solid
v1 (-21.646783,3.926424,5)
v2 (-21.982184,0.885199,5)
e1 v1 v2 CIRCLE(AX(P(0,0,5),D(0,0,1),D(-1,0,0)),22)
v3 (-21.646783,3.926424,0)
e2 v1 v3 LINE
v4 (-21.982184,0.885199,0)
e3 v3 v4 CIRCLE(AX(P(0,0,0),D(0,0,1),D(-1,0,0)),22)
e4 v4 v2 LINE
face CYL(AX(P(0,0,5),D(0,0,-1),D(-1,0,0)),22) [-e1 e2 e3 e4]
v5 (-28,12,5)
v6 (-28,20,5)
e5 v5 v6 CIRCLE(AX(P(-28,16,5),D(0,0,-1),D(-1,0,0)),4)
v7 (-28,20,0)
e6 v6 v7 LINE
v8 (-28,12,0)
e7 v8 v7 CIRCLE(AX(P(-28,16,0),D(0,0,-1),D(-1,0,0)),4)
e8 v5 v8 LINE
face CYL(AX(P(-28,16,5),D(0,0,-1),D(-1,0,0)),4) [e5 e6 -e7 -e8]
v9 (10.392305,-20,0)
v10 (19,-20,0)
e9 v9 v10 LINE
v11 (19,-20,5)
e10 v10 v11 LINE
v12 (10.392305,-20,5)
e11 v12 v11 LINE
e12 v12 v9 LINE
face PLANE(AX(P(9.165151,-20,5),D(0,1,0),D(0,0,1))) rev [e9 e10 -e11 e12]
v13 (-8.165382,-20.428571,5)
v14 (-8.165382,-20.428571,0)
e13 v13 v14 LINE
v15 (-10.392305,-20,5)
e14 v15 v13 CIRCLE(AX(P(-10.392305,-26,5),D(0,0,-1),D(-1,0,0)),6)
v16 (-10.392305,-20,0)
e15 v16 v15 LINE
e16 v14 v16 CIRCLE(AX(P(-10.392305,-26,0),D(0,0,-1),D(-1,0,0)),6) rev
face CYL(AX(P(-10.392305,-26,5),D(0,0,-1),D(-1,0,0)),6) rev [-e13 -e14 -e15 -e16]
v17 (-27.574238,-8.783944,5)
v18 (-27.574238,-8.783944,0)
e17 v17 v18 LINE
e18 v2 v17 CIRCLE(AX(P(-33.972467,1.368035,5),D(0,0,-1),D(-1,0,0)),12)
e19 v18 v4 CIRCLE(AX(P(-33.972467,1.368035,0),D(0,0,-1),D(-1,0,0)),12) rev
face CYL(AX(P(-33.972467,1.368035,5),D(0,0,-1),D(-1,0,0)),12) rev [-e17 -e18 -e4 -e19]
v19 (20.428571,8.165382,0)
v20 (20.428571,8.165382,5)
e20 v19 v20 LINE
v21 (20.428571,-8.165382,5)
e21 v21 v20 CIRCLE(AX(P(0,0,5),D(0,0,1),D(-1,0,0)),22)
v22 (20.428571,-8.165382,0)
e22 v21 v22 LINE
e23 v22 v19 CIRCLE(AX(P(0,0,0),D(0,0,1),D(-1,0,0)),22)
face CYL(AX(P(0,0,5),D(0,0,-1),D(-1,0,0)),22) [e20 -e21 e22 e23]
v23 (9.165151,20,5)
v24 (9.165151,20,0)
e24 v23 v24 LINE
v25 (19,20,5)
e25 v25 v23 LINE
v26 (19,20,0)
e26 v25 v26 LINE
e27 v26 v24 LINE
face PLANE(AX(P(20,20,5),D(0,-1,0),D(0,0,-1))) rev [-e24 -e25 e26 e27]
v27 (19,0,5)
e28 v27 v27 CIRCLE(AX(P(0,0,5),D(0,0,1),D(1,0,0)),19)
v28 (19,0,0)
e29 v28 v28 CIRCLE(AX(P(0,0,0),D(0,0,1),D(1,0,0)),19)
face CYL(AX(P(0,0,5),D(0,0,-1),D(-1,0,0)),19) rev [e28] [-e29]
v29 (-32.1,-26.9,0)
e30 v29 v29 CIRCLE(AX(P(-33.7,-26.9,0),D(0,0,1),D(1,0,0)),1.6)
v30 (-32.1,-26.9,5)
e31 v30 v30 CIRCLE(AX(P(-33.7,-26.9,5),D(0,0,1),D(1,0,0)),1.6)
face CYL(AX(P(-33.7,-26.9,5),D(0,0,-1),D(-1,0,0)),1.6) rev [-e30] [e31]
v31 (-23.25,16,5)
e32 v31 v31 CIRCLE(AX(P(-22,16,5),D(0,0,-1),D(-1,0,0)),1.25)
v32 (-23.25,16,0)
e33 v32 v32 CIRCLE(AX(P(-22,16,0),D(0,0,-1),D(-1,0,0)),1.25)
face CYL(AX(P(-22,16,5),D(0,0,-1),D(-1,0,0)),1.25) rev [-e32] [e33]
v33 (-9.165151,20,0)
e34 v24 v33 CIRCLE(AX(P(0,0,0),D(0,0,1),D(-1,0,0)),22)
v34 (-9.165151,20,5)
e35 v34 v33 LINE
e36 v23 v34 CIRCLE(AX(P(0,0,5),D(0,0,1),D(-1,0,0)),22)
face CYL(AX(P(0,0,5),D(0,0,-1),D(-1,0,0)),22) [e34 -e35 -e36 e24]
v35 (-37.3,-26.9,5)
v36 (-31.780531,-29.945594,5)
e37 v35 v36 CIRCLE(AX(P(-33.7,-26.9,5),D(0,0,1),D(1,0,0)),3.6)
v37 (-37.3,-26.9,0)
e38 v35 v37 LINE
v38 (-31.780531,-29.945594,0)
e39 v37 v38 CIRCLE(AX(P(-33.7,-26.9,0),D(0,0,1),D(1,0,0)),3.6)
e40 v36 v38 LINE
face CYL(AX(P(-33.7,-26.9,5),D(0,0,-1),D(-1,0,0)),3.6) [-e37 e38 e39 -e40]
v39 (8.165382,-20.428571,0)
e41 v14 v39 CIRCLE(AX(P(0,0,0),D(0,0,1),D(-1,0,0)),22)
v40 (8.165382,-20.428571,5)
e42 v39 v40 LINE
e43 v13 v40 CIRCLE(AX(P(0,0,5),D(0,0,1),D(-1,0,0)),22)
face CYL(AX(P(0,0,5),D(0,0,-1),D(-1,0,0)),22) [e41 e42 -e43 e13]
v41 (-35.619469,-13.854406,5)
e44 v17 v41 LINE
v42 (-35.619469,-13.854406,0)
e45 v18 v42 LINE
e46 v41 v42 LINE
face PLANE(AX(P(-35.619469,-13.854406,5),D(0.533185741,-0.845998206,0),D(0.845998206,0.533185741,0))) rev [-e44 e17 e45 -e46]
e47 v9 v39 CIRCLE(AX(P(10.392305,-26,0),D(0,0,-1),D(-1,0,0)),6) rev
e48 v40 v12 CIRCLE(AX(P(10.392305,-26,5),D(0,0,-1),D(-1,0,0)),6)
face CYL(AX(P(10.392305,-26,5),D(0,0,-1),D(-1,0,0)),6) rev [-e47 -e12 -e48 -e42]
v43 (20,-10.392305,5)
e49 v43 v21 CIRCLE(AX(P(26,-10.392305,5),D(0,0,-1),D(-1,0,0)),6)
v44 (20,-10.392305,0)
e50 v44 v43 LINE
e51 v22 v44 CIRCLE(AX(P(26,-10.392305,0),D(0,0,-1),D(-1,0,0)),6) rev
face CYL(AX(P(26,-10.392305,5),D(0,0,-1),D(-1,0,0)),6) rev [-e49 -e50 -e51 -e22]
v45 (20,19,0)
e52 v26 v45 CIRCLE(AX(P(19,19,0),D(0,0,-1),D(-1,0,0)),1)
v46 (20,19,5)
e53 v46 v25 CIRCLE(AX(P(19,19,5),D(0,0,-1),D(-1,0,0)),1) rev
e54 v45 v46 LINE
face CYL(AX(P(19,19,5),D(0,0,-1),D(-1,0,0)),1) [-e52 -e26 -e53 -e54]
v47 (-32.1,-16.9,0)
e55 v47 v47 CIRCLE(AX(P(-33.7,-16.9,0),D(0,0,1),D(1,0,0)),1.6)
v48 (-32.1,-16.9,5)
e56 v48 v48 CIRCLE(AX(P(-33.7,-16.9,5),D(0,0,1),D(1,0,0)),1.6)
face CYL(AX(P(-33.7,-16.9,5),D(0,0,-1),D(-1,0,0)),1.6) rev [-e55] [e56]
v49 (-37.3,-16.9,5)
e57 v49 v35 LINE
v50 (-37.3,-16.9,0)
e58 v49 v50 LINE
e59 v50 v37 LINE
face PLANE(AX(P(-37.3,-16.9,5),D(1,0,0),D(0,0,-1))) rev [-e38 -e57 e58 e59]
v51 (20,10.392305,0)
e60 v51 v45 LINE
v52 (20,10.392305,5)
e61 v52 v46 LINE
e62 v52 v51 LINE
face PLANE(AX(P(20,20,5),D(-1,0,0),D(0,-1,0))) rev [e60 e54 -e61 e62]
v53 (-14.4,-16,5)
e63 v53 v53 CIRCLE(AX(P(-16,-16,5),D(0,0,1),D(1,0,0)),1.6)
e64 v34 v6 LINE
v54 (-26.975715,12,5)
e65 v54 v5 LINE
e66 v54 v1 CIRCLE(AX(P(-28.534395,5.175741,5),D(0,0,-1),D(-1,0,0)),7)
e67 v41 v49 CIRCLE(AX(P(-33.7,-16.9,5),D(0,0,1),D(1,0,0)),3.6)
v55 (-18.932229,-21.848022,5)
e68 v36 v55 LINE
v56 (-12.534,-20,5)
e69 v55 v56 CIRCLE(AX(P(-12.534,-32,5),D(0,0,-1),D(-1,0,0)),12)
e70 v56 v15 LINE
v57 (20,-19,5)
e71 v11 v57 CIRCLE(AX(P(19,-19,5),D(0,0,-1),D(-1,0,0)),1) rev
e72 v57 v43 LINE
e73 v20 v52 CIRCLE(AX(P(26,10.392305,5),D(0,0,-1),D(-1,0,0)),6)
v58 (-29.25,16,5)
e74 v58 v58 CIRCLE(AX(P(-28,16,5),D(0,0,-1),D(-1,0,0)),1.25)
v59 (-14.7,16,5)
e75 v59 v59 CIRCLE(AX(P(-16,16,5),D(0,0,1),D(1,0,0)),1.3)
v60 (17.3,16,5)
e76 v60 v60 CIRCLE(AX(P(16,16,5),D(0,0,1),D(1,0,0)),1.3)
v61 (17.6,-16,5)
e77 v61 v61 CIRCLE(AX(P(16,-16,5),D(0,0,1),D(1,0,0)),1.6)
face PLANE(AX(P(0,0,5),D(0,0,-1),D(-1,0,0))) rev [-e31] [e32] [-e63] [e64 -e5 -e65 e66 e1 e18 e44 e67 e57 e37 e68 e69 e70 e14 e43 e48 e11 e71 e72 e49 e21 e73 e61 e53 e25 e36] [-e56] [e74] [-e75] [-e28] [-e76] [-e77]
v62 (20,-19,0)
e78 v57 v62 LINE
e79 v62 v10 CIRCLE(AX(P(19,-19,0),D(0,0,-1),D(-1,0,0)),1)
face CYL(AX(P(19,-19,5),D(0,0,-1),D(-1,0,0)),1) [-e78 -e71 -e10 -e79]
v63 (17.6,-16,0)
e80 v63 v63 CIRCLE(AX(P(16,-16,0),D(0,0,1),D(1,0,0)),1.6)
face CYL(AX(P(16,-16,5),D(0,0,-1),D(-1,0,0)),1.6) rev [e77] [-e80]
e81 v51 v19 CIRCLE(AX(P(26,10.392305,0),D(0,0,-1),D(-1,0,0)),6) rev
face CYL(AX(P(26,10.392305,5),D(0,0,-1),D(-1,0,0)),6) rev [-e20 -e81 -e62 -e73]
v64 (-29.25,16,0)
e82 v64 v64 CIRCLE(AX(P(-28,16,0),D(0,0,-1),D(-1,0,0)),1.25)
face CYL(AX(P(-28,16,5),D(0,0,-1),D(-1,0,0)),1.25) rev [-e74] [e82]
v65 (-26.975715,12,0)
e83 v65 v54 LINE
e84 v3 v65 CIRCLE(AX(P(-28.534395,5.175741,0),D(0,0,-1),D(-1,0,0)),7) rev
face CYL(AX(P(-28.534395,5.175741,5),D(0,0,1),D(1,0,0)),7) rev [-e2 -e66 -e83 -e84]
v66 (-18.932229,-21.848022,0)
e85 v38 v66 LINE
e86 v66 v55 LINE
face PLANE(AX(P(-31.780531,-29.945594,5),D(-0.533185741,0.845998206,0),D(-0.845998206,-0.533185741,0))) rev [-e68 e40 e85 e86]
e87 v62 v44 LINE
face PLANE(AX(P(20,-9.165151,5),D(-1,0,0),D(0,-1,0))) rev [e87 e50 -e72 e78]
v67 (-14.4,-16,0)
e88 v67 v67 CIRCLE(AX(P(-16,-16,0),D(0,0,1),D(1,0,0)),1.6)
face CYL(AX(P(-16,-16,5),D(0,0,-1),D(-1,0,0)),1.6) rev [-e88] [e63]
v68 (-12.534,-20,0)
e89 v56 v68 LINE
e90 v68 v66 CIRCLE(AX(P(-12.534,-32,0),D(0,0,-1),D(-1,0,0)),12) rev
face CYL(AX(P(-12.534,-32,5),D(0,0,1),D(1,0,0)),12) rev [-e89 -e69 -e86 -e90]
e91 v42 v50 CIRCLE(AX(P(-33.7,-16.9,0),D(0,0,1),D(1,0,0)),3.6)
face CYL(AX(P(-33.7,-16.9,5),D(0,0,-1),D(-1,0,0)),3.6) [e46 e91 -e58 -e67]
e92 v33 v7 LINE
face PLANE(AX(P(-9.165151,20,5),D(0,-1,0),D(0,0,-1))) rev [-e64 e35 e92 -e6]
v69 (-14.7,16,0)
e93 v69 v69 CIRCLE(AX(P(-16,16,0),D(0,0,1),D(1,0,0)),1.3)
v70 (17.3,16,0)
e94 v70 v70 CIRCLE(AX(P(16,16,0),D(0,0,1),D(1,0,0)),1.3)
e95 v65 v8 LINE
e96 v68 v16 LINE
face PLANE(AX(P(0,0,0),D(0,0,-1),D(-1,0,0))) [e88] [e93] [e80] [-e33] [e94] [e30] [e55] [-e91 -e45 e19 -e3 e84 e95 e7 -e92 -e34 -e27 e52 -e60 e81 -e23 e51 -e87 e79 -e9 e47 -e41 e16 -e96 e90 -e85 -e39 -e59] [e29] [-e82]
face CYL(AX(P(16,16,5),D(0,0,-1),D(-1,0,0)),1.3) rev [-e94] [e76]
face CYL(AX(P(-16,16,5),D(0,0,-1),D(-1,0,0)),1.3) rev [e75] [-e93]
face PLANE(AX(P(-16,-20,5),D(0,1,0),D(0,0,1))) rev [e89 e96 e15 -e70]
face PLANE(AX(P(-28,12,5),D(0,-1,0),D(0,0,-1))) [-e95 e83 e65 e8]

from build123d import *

# Parameters (mm, degrees)
SKETCH1_R           = 19
SKETCH1_R_2         = 1.6
SKETCH1_R_3         = 1.3
BOSS_EXTRUDE1_DEPTH = 5
FILLET1_R           = 12
FILLET3_R           = 12
FILLET4_R           = 1
FILLET5_R           = 6
SKETCH6_R           = 1.25
BOSS_EXTRUDE3_DEPTH = 5
FILLET6_R           = 10
FILLET8_R           = 7


with BuildPart() as part:
    # Sketch1 → Boss-Extrude1 (new body)
    with BuildSketch(Plane.XY):
        with BuildLine():
            Line((-37.3, -16.9), (-37.3, -26.9))
            ThreePointArc((-37.3, -26.9), (-35.439240178, -30.051990419), (-31.780531331, -29.945593543))
            Line((-31.780531331, -29.945593543), (-16, -20))
            Line((-16, -20), (-9.16515139, -20))
            ThreePointArc((-9.16515139, -20), (0, -22), (9.16515139, -20))
            Line((9.16515139, -20), (20, -20))
            Line((20, -20), (20, -9.16515139))
            ThreePointArc((20, -9.16515139), (22, 0), (20, 9.16515139))
            Line((20, 9.16515139), (20, 20))
            Line((20, 20), (9.16515139, 20))
            ThreePointArc((9.16515139, 20), (0, 22), (-9.16515139, 20))
            Line((-9.16515139, 20), (-20, 20))
            Line((-20, 20), (-20, 9.16515139))
            ThreePointArc((-20, 9.16515139), (-21.885463921, 2.241978803), (-21.442870984, -4.91968332))
            Line((-21.442870984, -4.91968332), (-35.619468669, -13.854406457))
            ThreePointArc((-35.619468669, -13.854406457), (-36.851990419, -15.160759822), (-37.3, -16.9))
        make_face()
        Circle(SKETCH1_R, mode=Mode.SUBTRACT)
        with Locations((-33.7, -16.9)):
            Circle(SKETCH1_R_2, mode=Mode.SUBTRACT)
        with Locations((-33.7, -26.9)):
            Circle(SKETCH1_R_2, mode=Mode.SUBTRACT)
        with Locations((-16, 16)):
            Circle(SKETCH1_R_3, mode=Mode.SUBTRACT)
        with Locations((16, 16)):
            Circle(SKETCH1_R_3, mode=Mode.SUBTRACT)
        with Locations((16, -16)):
            Circle(SKETCH1_R_2, mode=Mode.SUBTRACT)
        with Locations((-16, -16)):
            Circle(SKETCH1_R_2, mode=Mode.SUBTRACT)
    extrude(amount=BOSS_EXTRUDE1_DEPTH)

    # Fillet1
    fillet1_edges = [part.edges().sort_by_distance(p)[0] for p in [
        (-21.442870984, -4.91968332, 2.5),
    ]]
    fillet(fillet1_edges, radius=FILLET1_R)

    # Fillet3
    fillet3_edges = [part.edges().sort_by_distance(p)[0] for p in [
        (-16, -20, 2.5),
    ]]
    fillet(fillet3_edges, radius=FILLET3_R)

    # Fillet4
    fillet4_edges = [part.edges().sort_by_distance(p)[0] for p in [
        (20, 20, 2.5),
        (20, -20, 2.5),
    ]]
    fillet(fillet4_edges, radius=FILLET4_R)

    # Fillet5
    fillet5_edges = [part.edges().sort_by_distance(p)[0] for p in [
        (9.16515139, -20, 2.5),
        (-9.16515139, -20, 2.5),
        (20, 9.16515139, 2.5),
        (20, -9.16515139, 2.5),
    ]]
    fillet(fillet5_edges, radius=FILLET5_R)

    # Sketch6 → Boss-Extrude3 (add)
    with BuildSketch(Plane(origin=(0, 0, 0), x_dir=(-1, 0, 0), z_dir=(0, 0, -1))):
        with BuildLine():
            Line((22, 20), (20, 20))
            Line((20, 20), (20, 12))
            Line((20, 12), (22, 12))
            Line((22, 12), (28, 12))
            ThreePointArc((28, 12), (32, 16), (28, 20))
            Line((28, 20), (22, 20))
        make_face()
        with Locations((22, 16)):
            Circle(SKETCH6_R, mode=Mode.SUBTRACT)
        with Locations((28, 16)):
            Circle(SKETCH6_R, mode=Mode.SUBTRACT)
    extrude(amount=-BOSS_EXTRUDE3_DEPTH)

    # Fillet6
    # the kernel refuses this fillet: 10 mm, written as the material it adds along each edge
    with BuildSketch(Plane(origin=(-20, 12, 0), x_dir=(0, -1, 0), z_dir=(0, 0, 1))) as fillet6_piece_1:
        with BuildLine():
            CenterArc((10, -6.975715416), FILLET6_R, 135.767508297, 44.232491703)
            Line((0, -6.975715416), (-0.2, -6.975715416))
            Line((-0.2, -6.975715416), (-0.2, 0))
            Line((-0.2, 0), (0, 0.2))
            ThreePointArc((0, 0.2), (1.417424305, 0.2), (2.691545582, 0.139514308))
            Line((2.691545582, 0.139514308), (2.83484861, 0))
        make_face()
    extrude(amount=5)

    # Fillet8
    # the kernel refuses this fillet: 7 mm, written as the material it adds along each edge
    with BuildSketch(Plane(origin=(-20, 9.16515139, 0), x_dir=(-0.9264219176463756, 0.3764869592753673, 0), z_dir=(0, 0, 1))) as fillet8_piece_1:
        with BuildLine():
            CenterArc((6.404489612, 6.90896616), FILLET8_R, 191.835369606, 87.415058428)
            ThreePointArc((-0.446697133, 5.473264176), (-0.051904318, 2.750624406), (0, 0))
            ThreePointArc((0, 0), (3.764869593, -0.735780824), (7.529739186, 0))
        make_face()
    extrude(amount=5)


solid = part.part
